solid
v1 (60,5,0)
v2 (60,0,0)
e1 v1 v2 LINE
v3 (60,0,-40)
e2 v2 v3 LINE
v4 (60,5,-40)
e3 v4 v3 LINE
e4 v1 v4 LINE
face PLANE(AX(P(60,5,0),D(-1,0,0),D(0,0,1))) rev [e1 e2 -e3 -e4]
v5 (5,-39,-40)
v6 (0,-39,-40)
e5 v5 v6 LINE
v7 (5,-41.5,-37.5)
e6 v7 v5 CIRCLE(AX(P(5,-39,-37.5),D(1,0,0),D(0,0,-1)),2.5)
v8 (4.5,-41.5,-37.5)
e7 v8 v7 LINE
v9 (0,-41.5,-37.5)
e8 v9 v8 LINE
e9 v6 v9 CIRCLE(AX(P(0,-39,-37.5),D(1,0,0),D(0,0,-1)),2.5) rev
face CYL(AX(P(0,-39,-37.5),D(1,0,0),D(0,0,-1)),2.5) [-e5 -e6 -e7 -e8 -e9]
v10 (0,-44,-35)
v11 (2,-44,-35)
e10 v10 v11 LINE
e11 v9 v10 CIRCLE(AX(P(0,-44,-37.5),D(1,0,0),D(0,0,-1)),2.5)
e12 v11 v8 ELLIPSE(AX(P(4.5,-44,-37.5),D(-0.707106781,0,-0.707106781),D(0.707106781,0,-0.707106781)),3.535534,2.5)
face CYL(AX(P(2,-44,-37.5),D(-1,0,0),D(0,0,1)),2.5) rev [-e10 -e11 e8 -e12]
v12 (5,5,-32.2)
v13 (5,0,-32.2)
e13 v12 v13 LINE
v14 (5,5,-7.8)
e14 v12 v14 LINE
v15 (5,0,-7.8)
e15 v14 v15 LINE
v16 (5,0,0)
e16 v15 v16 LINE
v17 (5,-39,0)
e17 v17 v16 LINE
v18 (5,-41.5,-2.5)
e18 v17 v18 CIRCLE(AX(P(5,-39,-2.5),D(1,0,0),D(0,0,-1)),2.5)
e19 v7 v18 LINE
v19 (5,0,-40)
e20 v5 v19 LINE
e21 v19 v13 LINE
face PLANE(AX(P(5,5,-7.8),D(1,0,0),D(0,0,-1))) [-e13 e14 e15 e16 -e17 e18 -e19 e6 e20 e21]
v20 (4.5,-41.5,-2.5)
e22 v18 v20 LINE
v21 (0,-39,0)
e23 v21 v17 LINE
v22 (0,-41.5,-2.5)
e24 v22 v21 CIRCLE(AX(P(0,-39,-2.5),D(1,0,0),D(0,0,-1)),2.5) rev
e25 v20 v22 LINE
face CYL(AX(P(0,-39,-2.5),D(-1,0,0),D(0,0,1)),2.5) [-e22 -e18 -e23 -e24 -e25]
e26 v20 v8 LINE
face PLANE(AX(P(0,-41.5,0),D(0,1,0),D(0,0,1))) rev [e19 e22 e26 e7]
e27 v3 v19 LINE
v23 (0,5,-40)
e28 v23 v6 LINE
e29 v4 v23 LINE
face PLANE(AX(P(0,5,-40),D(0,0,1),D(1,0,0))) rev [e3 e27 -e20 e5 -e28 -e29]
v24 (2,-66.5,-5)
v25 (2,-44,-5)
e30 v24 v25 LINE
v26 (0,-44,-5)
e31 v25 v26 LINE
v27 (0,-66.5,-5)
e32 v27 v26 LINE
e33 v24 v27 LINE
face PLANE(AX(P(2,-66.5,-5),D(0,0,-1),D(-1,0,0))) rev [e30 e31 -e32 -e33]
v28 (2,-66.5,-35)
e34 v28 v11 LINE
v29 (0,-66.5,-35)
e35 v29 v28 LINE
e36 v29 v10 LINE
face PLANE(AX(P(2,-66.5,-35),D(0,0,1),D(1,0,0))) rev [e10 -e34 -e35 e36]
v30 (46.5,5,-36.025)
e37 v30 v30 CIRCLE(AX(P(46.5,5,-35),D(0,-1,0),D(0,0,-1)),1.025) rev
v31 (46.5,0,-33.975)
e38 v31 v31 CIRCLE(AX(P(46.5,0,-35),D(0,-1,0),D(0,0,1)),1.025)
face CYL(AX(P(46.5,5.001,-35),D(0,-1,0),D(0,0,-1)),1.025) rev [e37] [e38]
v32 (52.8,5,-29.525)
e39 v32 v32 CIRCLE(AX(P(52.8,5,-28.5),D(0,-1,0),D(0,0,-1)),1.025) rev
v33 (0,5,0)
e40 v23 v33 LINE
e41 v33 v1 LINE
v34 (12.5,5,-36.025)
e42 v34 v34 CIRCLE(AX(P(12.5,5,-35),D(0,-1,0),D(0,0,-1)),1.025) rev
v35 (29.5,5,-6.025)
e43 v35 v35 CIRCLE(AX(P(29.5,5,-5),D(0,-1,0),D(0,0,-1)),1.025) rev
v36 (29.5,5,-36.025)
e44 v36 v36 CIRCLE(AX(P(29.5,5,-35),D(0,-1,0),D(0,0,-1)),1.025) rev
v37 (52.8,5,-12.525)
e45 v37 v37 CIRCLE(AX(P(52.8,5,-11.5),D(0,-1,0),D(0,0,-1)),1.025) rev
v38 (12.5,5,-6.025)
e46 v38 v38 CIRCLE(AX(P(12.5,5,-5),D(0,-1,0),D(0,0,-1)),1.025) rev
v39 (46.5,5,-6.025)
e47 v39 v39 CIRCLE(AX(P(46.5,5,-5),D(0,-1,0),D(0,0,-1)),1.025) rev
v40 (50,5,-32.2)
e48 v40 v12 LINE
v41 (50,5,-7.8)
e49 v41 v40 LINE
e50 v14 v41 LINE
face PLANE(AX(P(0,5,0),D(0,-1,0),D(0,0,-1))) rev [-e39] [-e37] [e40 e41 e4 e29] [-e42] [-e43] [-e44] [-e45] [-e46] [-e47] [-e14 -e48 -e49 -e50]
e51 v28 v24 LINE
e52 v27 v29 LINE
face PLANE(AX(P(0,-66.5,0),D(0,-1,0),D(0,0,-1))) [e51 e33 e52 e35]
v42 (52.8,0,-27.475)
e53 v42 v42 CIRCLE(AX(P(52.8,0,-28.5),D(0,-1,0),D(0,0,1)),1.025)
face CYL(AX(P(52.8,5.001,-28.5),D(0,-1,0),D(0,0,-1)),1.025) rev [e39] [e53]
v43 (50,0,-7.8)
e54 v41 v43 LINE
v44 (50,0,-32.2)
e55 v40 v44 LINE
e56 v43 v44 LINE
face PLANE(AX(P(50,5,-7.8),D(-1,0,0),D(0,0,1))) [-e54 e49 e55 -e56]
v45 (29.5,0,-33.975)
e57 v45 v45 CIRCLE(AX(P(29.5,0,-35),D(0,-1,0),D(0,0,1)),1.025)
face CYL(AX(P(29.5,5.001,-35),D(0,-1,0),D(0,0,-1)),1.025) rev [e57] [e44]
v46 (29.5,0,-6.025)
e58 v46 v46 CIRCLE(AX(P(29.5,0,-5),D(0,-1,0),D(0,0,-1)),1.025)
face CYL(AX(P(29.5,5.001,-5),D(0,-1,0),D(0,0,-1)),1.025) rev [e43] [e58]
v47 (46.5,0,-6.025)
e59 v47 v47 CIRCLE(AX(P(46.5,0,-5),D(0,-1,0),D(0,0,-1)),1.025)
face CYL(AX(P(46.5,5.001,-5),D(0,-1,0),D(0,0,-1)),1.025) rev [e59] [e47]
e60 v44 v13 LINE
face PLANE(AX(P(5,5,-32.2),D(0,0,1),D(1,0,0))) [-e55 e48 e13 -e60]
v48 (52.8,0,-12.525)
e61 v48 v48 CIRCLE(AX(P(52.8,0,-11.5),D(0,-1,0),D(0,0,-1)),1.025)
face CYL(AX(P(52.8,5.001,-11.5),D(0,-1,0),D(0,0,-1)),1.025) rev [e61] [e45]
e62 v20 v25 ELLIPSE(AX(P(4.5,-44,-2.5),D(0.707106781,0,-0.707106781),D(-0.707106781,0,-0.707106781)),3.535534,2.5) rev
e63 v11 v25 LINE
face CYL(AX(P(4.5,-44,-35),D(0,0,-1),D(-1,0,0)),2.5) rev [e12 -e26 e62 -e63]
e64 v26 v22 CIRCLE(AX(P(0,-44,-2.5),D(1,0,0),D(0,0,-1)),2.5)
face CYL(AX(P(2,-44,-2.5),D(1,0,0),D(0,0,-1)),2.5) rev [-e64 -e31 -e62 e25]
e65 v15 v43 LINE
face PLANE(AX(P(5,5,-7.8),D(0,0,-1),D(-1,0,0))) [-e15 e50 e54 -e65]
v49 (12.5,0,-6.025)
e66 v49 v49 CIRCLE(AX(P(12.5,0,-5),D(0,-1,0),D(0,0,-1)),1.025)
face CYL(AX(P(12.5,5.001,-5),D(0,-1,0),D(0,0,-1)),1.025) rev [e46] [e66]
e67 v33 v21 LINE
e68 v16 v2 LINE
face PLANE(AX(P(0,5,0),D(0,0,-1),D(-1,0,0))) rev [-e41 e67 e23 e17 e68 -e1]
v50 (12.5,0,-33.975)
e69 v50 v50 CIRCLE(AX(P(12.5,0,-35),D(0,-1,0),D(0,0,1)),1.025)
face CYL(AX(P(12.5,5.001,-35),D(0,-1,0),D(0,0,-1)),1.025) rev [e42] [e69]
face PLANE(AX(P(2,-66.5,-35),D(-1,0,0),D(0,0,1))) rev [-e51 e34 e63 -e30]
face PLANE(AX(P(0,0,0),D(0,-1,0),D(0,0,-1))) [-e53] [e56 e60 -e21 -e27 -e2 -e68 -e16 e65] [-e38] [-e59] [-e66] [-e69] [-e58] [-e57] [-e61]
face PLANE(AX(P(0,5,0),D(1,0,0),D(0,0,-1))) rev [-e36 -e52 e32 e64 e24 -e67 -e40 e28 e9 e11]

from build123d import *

# Parameters (mm, degrees)
SKETCH1_W           = 60
SKETCH1_H           = 40
SKETCH1_W_2         = 45
SKETCH1_H_2         = 24.4
BOSS_EXTRUDE1_DEPTH = 5
SKETCH6_W           = 5
SKETCH6_H           = 40
BOSS_EXTRUDE4_DEPTH = 41.5
SKETCH7_W           = 2
SKETCH7_H           = 30
BOSS_EXTRUDE5_DEPTH = 25
FILLET2_R           = 2.5
FILLET3_R           = 2.5
CUT_EXTRUDE1_REACH  = 100.093
SKETCH8_R           = 1.025


with BuildPart() as part:
    # Sketch1 → Boss-Extrude1 (new body)
    with BuildSketch(Plane(origin=(0, 0, 0), x_dir=(1, 0, 0), z_dir=(0, 1, 0))):
        with Locations((30, 20)):
            Rectangle(SKETCH1_W, SKETCH1_H)
        with Locations((27.5, 20)):
            Rectangle(SKETCH1_W_2, SKETCH1_H_2, mode=Mode.SUBTRACT)
    extrude(amount=BOSS_EXTRUDE1_DEPTH)

    # Sketch6 → Boss-Extrude4 (add)
    with BuildSketch(Plane.XZ):
        with Locations((2.5, -20)):
            Rectangle(SKETCH6_W, SKETCH6_H)
    extrude(amount=BOSS_EXTRUDE4_DEPTH)

    # Sketch7 → Boss-Extrude5 (add)
    with BuildSketch(Plane(origin=(0, -41.5, 0), x_dir=(-1, 0, 0), z_dir=(0, -1, 0))):
        with Locations((-1, 20)):
            Rectangle(SKETCH7_W, SKETCH7_H)
    extrude(amount=BOSS_EXTRUDE5_DEPTH)

    # Fillet2
    fillet2_edges = [part.edges().sort_by_distance(p)[0] for p in [
        (2, -41.5, -20),
    ]]
    fillet(fillet2_edges, radius=FILLET2_R)

    # Fillet3
    fillet3_edges = [part.edges().sort_by_distance(p)[0] for p in [
        (2.25, -41.5, -5),
        (2.25, -41.5, -35),
        (2.5, -41.5, 0),
        (2.5, -41.5, -40),
    ]]
    fillet(fillet3_edges, radius=FILLET3_R - 0.0001)  # a hair under: the kernel refuses the full size

    # Sketch8 → Cut-Extrude1 (cut, up to next)
    with BuildSketch(Plane(origin=(0, 0, 0), x_dir=(-1, 0, 0), z_dir=(0, -1, 0)), mode=Mode.PRIVATE) as cut_extrude1_sk1:
        with Locations(Location((-46.5, 5, 0), (0, 0, 90))):
            Circle(SKETCH8_R)
    cut_extrude1_tool1 = extrude(cut_extrude1_sk1.sketch, amount=-CUT_EXTRUDE1_REACH, mode=Mode.PRIVATE) & part.part
    # Sketch8 → Cut-Extrude1 (cut, up to next)
    with BuildSketch(Plane(origin=(0, 0, 0), x_dir=(-1, 0, 0), z_dir=(0, -1, 0)), mode=Mode.PRIVATE) as cut_extrude1_sk2:
        with Locations(Location((-29.5, 5, 0), (0, 0, 90))):
            Circle(SKETCH8_R)
    cut_extrude1_tool2 = extrude(cut_extrude1_sk2.sketch, amount=-CUT_EXTRUDE1_REACH, mode=Mode.PRIVATE) & part.part
    # Sketch8 → Cut-Extrude1 (cut, up to next)
    with BuildSketch(Plane(origin=(0, 0, 0), x_dir=(-1, 0, 0), z_dir=(0, -1, 0)), mode=Mode.PRIVATE) as cut_extrude1_sk3:
        with Locations(Location((-12.5, 5, 0), (0, 0, 90))):
            Circle(SKETCH8_R)
    cut_extrude1_tool3 = extrude(cut_extrude1_sk3.sketch, amount=-CUT_EXTRUDE1_REACH, mode=Mode.PRIVATE) & part.part
    # Sketch8 → Cut-Extrude1 (cut, up to next)
    with BuildSketch(Plane(origin=(0, 0, 0), x_dir=(-1, 0, 0), z_dir=(0, -1, 0)), mode=Mode.PRIVATE) as cut_extrude1_sk4:
        with Locations(Location((-52.8, 11.5, 0), (0, 0, 90))):
            Circle(SKETCH8_R)
    cut_extrude1_tool4 = extrude(cut_extrude1_sk4.sketch, amount=-CUT_EXTRUDE1_REACH, mode=Mode.PRIVATE) & part.part
    # Sketch8 → Cut-Extrude1 (cut, up to next)
    with BuildSketch(Plane(origin=(0, 0, 0), x_dir=(-1, 0, 0), z_dir=(0, -1, 0)), mode=Mode.PRIVATE) as cut_extrude1_sk5:
        with Locations(Location((-12.5, 35, 0), (0, 0, 90))):
            Circle(SKETCH8_R)
    cut_extrude1_tool5 = extrude(cut_extrude1_sk5.sketch, amount=-CUT_EXTRUDE1_REACH, mode=Mode.PRIVATE) & part.part
    # Sketch8 → Cut-Extrude1 (cut, up to next)
    with BuildSketch(Plane(origin=(0, 0, 0), x_dir=(-1, 0, 0), z_dir=(0, -1, 0)), mode=Mode.PRIVATE) as cut_extrude1_sk6:
        with Locations(Location((-29.5, 35, 0), (0, 0, 90))):
            Circle(SKETCH8_R)
    cut_extrude1_tool6 = extrude(cut_extrude1_sk6.sketch, amount=-CUT_EXTRUDE1_REACH, mode=Mode.PRIVATE) & part.part
    # Sketch8 → Cut-Extrude1 (cut, up to next)
    with BuildSketch(Plane(origin=(0, 0, 0), x_dir=(-1, 0, 0), z_dir=(0, -1, 0)), mode=Mode.PRIVATE) as cut_extrude1_sk7:
        with Locations(Location((-46.5, 35, 0), (0, 0, 90))):
            Circle(SKETCH8_R)
    cut_extrude1_tool7 = extrude(cut_extrude1_sk7.sketch, amount=-CUT_EXTRUDE1_REACH, mode=Mode.PRIVATE) & part.part
    # Sketch8 → Cut-Extrude1 (cut, up to next)
    with BuildSketch(Plane(origin=(0, 0, 0), x_dir=(-1, 0, 0), z_dir=(0, -1, 0)), mode=Mode.PRIVATE) as cut_extrude1_sk8:
        with Locations(Location((-52.8, 28.5, 0), (0, 0, 90))):
            Circle(SKETCH8_R)
    cut_extrude1_tool8 = extrude(cut_extrude1_sk8.sketch, amount=-CUT_EXTRUDE1_REACH, mode=Mode.PRIVATE) & part.part
    add(cut_extrude1_tool1.solids().sort_by_distance((46.5, 0, -5))[0], mode=Mode.SUBTRACT)
    add(cut_extrude1_tool2.solids().sort_by_distance((29.5, 0, -5))[0], mode=Mode.SUBTRACT)
    add(cut_extrude1_tool3.solids().sort_by_distance((12.5, 0, -5))[0], mode=Mode.SUBTRACT)
    add(cut_extrude1_tool4.solids().sort_by_distance((52.8, 0, -11.5))[0], mode=Mode.SUBTRACT)
    add(cut_extrude1_tool5.solids().sort_by_distance((12.5, 0, -35))[0], mode=Mode.SUBTRACT)
    add(cut_extrude1_tool6.solids().sort_by_distance((29.5, 0, -35))[0], mode=Mode.SUBTRACT)
    add(cut_extrude1_tool7.solids().sort_by_distance((46.5, 0, -35))[0], mode=Mode.SUBTRACT)
    add(cut_extrude1_tool8.solids().sort_by_distance((52.8, 0, -28.5))[0], mode=Mode.SUBTRACT)


solid = part.part
